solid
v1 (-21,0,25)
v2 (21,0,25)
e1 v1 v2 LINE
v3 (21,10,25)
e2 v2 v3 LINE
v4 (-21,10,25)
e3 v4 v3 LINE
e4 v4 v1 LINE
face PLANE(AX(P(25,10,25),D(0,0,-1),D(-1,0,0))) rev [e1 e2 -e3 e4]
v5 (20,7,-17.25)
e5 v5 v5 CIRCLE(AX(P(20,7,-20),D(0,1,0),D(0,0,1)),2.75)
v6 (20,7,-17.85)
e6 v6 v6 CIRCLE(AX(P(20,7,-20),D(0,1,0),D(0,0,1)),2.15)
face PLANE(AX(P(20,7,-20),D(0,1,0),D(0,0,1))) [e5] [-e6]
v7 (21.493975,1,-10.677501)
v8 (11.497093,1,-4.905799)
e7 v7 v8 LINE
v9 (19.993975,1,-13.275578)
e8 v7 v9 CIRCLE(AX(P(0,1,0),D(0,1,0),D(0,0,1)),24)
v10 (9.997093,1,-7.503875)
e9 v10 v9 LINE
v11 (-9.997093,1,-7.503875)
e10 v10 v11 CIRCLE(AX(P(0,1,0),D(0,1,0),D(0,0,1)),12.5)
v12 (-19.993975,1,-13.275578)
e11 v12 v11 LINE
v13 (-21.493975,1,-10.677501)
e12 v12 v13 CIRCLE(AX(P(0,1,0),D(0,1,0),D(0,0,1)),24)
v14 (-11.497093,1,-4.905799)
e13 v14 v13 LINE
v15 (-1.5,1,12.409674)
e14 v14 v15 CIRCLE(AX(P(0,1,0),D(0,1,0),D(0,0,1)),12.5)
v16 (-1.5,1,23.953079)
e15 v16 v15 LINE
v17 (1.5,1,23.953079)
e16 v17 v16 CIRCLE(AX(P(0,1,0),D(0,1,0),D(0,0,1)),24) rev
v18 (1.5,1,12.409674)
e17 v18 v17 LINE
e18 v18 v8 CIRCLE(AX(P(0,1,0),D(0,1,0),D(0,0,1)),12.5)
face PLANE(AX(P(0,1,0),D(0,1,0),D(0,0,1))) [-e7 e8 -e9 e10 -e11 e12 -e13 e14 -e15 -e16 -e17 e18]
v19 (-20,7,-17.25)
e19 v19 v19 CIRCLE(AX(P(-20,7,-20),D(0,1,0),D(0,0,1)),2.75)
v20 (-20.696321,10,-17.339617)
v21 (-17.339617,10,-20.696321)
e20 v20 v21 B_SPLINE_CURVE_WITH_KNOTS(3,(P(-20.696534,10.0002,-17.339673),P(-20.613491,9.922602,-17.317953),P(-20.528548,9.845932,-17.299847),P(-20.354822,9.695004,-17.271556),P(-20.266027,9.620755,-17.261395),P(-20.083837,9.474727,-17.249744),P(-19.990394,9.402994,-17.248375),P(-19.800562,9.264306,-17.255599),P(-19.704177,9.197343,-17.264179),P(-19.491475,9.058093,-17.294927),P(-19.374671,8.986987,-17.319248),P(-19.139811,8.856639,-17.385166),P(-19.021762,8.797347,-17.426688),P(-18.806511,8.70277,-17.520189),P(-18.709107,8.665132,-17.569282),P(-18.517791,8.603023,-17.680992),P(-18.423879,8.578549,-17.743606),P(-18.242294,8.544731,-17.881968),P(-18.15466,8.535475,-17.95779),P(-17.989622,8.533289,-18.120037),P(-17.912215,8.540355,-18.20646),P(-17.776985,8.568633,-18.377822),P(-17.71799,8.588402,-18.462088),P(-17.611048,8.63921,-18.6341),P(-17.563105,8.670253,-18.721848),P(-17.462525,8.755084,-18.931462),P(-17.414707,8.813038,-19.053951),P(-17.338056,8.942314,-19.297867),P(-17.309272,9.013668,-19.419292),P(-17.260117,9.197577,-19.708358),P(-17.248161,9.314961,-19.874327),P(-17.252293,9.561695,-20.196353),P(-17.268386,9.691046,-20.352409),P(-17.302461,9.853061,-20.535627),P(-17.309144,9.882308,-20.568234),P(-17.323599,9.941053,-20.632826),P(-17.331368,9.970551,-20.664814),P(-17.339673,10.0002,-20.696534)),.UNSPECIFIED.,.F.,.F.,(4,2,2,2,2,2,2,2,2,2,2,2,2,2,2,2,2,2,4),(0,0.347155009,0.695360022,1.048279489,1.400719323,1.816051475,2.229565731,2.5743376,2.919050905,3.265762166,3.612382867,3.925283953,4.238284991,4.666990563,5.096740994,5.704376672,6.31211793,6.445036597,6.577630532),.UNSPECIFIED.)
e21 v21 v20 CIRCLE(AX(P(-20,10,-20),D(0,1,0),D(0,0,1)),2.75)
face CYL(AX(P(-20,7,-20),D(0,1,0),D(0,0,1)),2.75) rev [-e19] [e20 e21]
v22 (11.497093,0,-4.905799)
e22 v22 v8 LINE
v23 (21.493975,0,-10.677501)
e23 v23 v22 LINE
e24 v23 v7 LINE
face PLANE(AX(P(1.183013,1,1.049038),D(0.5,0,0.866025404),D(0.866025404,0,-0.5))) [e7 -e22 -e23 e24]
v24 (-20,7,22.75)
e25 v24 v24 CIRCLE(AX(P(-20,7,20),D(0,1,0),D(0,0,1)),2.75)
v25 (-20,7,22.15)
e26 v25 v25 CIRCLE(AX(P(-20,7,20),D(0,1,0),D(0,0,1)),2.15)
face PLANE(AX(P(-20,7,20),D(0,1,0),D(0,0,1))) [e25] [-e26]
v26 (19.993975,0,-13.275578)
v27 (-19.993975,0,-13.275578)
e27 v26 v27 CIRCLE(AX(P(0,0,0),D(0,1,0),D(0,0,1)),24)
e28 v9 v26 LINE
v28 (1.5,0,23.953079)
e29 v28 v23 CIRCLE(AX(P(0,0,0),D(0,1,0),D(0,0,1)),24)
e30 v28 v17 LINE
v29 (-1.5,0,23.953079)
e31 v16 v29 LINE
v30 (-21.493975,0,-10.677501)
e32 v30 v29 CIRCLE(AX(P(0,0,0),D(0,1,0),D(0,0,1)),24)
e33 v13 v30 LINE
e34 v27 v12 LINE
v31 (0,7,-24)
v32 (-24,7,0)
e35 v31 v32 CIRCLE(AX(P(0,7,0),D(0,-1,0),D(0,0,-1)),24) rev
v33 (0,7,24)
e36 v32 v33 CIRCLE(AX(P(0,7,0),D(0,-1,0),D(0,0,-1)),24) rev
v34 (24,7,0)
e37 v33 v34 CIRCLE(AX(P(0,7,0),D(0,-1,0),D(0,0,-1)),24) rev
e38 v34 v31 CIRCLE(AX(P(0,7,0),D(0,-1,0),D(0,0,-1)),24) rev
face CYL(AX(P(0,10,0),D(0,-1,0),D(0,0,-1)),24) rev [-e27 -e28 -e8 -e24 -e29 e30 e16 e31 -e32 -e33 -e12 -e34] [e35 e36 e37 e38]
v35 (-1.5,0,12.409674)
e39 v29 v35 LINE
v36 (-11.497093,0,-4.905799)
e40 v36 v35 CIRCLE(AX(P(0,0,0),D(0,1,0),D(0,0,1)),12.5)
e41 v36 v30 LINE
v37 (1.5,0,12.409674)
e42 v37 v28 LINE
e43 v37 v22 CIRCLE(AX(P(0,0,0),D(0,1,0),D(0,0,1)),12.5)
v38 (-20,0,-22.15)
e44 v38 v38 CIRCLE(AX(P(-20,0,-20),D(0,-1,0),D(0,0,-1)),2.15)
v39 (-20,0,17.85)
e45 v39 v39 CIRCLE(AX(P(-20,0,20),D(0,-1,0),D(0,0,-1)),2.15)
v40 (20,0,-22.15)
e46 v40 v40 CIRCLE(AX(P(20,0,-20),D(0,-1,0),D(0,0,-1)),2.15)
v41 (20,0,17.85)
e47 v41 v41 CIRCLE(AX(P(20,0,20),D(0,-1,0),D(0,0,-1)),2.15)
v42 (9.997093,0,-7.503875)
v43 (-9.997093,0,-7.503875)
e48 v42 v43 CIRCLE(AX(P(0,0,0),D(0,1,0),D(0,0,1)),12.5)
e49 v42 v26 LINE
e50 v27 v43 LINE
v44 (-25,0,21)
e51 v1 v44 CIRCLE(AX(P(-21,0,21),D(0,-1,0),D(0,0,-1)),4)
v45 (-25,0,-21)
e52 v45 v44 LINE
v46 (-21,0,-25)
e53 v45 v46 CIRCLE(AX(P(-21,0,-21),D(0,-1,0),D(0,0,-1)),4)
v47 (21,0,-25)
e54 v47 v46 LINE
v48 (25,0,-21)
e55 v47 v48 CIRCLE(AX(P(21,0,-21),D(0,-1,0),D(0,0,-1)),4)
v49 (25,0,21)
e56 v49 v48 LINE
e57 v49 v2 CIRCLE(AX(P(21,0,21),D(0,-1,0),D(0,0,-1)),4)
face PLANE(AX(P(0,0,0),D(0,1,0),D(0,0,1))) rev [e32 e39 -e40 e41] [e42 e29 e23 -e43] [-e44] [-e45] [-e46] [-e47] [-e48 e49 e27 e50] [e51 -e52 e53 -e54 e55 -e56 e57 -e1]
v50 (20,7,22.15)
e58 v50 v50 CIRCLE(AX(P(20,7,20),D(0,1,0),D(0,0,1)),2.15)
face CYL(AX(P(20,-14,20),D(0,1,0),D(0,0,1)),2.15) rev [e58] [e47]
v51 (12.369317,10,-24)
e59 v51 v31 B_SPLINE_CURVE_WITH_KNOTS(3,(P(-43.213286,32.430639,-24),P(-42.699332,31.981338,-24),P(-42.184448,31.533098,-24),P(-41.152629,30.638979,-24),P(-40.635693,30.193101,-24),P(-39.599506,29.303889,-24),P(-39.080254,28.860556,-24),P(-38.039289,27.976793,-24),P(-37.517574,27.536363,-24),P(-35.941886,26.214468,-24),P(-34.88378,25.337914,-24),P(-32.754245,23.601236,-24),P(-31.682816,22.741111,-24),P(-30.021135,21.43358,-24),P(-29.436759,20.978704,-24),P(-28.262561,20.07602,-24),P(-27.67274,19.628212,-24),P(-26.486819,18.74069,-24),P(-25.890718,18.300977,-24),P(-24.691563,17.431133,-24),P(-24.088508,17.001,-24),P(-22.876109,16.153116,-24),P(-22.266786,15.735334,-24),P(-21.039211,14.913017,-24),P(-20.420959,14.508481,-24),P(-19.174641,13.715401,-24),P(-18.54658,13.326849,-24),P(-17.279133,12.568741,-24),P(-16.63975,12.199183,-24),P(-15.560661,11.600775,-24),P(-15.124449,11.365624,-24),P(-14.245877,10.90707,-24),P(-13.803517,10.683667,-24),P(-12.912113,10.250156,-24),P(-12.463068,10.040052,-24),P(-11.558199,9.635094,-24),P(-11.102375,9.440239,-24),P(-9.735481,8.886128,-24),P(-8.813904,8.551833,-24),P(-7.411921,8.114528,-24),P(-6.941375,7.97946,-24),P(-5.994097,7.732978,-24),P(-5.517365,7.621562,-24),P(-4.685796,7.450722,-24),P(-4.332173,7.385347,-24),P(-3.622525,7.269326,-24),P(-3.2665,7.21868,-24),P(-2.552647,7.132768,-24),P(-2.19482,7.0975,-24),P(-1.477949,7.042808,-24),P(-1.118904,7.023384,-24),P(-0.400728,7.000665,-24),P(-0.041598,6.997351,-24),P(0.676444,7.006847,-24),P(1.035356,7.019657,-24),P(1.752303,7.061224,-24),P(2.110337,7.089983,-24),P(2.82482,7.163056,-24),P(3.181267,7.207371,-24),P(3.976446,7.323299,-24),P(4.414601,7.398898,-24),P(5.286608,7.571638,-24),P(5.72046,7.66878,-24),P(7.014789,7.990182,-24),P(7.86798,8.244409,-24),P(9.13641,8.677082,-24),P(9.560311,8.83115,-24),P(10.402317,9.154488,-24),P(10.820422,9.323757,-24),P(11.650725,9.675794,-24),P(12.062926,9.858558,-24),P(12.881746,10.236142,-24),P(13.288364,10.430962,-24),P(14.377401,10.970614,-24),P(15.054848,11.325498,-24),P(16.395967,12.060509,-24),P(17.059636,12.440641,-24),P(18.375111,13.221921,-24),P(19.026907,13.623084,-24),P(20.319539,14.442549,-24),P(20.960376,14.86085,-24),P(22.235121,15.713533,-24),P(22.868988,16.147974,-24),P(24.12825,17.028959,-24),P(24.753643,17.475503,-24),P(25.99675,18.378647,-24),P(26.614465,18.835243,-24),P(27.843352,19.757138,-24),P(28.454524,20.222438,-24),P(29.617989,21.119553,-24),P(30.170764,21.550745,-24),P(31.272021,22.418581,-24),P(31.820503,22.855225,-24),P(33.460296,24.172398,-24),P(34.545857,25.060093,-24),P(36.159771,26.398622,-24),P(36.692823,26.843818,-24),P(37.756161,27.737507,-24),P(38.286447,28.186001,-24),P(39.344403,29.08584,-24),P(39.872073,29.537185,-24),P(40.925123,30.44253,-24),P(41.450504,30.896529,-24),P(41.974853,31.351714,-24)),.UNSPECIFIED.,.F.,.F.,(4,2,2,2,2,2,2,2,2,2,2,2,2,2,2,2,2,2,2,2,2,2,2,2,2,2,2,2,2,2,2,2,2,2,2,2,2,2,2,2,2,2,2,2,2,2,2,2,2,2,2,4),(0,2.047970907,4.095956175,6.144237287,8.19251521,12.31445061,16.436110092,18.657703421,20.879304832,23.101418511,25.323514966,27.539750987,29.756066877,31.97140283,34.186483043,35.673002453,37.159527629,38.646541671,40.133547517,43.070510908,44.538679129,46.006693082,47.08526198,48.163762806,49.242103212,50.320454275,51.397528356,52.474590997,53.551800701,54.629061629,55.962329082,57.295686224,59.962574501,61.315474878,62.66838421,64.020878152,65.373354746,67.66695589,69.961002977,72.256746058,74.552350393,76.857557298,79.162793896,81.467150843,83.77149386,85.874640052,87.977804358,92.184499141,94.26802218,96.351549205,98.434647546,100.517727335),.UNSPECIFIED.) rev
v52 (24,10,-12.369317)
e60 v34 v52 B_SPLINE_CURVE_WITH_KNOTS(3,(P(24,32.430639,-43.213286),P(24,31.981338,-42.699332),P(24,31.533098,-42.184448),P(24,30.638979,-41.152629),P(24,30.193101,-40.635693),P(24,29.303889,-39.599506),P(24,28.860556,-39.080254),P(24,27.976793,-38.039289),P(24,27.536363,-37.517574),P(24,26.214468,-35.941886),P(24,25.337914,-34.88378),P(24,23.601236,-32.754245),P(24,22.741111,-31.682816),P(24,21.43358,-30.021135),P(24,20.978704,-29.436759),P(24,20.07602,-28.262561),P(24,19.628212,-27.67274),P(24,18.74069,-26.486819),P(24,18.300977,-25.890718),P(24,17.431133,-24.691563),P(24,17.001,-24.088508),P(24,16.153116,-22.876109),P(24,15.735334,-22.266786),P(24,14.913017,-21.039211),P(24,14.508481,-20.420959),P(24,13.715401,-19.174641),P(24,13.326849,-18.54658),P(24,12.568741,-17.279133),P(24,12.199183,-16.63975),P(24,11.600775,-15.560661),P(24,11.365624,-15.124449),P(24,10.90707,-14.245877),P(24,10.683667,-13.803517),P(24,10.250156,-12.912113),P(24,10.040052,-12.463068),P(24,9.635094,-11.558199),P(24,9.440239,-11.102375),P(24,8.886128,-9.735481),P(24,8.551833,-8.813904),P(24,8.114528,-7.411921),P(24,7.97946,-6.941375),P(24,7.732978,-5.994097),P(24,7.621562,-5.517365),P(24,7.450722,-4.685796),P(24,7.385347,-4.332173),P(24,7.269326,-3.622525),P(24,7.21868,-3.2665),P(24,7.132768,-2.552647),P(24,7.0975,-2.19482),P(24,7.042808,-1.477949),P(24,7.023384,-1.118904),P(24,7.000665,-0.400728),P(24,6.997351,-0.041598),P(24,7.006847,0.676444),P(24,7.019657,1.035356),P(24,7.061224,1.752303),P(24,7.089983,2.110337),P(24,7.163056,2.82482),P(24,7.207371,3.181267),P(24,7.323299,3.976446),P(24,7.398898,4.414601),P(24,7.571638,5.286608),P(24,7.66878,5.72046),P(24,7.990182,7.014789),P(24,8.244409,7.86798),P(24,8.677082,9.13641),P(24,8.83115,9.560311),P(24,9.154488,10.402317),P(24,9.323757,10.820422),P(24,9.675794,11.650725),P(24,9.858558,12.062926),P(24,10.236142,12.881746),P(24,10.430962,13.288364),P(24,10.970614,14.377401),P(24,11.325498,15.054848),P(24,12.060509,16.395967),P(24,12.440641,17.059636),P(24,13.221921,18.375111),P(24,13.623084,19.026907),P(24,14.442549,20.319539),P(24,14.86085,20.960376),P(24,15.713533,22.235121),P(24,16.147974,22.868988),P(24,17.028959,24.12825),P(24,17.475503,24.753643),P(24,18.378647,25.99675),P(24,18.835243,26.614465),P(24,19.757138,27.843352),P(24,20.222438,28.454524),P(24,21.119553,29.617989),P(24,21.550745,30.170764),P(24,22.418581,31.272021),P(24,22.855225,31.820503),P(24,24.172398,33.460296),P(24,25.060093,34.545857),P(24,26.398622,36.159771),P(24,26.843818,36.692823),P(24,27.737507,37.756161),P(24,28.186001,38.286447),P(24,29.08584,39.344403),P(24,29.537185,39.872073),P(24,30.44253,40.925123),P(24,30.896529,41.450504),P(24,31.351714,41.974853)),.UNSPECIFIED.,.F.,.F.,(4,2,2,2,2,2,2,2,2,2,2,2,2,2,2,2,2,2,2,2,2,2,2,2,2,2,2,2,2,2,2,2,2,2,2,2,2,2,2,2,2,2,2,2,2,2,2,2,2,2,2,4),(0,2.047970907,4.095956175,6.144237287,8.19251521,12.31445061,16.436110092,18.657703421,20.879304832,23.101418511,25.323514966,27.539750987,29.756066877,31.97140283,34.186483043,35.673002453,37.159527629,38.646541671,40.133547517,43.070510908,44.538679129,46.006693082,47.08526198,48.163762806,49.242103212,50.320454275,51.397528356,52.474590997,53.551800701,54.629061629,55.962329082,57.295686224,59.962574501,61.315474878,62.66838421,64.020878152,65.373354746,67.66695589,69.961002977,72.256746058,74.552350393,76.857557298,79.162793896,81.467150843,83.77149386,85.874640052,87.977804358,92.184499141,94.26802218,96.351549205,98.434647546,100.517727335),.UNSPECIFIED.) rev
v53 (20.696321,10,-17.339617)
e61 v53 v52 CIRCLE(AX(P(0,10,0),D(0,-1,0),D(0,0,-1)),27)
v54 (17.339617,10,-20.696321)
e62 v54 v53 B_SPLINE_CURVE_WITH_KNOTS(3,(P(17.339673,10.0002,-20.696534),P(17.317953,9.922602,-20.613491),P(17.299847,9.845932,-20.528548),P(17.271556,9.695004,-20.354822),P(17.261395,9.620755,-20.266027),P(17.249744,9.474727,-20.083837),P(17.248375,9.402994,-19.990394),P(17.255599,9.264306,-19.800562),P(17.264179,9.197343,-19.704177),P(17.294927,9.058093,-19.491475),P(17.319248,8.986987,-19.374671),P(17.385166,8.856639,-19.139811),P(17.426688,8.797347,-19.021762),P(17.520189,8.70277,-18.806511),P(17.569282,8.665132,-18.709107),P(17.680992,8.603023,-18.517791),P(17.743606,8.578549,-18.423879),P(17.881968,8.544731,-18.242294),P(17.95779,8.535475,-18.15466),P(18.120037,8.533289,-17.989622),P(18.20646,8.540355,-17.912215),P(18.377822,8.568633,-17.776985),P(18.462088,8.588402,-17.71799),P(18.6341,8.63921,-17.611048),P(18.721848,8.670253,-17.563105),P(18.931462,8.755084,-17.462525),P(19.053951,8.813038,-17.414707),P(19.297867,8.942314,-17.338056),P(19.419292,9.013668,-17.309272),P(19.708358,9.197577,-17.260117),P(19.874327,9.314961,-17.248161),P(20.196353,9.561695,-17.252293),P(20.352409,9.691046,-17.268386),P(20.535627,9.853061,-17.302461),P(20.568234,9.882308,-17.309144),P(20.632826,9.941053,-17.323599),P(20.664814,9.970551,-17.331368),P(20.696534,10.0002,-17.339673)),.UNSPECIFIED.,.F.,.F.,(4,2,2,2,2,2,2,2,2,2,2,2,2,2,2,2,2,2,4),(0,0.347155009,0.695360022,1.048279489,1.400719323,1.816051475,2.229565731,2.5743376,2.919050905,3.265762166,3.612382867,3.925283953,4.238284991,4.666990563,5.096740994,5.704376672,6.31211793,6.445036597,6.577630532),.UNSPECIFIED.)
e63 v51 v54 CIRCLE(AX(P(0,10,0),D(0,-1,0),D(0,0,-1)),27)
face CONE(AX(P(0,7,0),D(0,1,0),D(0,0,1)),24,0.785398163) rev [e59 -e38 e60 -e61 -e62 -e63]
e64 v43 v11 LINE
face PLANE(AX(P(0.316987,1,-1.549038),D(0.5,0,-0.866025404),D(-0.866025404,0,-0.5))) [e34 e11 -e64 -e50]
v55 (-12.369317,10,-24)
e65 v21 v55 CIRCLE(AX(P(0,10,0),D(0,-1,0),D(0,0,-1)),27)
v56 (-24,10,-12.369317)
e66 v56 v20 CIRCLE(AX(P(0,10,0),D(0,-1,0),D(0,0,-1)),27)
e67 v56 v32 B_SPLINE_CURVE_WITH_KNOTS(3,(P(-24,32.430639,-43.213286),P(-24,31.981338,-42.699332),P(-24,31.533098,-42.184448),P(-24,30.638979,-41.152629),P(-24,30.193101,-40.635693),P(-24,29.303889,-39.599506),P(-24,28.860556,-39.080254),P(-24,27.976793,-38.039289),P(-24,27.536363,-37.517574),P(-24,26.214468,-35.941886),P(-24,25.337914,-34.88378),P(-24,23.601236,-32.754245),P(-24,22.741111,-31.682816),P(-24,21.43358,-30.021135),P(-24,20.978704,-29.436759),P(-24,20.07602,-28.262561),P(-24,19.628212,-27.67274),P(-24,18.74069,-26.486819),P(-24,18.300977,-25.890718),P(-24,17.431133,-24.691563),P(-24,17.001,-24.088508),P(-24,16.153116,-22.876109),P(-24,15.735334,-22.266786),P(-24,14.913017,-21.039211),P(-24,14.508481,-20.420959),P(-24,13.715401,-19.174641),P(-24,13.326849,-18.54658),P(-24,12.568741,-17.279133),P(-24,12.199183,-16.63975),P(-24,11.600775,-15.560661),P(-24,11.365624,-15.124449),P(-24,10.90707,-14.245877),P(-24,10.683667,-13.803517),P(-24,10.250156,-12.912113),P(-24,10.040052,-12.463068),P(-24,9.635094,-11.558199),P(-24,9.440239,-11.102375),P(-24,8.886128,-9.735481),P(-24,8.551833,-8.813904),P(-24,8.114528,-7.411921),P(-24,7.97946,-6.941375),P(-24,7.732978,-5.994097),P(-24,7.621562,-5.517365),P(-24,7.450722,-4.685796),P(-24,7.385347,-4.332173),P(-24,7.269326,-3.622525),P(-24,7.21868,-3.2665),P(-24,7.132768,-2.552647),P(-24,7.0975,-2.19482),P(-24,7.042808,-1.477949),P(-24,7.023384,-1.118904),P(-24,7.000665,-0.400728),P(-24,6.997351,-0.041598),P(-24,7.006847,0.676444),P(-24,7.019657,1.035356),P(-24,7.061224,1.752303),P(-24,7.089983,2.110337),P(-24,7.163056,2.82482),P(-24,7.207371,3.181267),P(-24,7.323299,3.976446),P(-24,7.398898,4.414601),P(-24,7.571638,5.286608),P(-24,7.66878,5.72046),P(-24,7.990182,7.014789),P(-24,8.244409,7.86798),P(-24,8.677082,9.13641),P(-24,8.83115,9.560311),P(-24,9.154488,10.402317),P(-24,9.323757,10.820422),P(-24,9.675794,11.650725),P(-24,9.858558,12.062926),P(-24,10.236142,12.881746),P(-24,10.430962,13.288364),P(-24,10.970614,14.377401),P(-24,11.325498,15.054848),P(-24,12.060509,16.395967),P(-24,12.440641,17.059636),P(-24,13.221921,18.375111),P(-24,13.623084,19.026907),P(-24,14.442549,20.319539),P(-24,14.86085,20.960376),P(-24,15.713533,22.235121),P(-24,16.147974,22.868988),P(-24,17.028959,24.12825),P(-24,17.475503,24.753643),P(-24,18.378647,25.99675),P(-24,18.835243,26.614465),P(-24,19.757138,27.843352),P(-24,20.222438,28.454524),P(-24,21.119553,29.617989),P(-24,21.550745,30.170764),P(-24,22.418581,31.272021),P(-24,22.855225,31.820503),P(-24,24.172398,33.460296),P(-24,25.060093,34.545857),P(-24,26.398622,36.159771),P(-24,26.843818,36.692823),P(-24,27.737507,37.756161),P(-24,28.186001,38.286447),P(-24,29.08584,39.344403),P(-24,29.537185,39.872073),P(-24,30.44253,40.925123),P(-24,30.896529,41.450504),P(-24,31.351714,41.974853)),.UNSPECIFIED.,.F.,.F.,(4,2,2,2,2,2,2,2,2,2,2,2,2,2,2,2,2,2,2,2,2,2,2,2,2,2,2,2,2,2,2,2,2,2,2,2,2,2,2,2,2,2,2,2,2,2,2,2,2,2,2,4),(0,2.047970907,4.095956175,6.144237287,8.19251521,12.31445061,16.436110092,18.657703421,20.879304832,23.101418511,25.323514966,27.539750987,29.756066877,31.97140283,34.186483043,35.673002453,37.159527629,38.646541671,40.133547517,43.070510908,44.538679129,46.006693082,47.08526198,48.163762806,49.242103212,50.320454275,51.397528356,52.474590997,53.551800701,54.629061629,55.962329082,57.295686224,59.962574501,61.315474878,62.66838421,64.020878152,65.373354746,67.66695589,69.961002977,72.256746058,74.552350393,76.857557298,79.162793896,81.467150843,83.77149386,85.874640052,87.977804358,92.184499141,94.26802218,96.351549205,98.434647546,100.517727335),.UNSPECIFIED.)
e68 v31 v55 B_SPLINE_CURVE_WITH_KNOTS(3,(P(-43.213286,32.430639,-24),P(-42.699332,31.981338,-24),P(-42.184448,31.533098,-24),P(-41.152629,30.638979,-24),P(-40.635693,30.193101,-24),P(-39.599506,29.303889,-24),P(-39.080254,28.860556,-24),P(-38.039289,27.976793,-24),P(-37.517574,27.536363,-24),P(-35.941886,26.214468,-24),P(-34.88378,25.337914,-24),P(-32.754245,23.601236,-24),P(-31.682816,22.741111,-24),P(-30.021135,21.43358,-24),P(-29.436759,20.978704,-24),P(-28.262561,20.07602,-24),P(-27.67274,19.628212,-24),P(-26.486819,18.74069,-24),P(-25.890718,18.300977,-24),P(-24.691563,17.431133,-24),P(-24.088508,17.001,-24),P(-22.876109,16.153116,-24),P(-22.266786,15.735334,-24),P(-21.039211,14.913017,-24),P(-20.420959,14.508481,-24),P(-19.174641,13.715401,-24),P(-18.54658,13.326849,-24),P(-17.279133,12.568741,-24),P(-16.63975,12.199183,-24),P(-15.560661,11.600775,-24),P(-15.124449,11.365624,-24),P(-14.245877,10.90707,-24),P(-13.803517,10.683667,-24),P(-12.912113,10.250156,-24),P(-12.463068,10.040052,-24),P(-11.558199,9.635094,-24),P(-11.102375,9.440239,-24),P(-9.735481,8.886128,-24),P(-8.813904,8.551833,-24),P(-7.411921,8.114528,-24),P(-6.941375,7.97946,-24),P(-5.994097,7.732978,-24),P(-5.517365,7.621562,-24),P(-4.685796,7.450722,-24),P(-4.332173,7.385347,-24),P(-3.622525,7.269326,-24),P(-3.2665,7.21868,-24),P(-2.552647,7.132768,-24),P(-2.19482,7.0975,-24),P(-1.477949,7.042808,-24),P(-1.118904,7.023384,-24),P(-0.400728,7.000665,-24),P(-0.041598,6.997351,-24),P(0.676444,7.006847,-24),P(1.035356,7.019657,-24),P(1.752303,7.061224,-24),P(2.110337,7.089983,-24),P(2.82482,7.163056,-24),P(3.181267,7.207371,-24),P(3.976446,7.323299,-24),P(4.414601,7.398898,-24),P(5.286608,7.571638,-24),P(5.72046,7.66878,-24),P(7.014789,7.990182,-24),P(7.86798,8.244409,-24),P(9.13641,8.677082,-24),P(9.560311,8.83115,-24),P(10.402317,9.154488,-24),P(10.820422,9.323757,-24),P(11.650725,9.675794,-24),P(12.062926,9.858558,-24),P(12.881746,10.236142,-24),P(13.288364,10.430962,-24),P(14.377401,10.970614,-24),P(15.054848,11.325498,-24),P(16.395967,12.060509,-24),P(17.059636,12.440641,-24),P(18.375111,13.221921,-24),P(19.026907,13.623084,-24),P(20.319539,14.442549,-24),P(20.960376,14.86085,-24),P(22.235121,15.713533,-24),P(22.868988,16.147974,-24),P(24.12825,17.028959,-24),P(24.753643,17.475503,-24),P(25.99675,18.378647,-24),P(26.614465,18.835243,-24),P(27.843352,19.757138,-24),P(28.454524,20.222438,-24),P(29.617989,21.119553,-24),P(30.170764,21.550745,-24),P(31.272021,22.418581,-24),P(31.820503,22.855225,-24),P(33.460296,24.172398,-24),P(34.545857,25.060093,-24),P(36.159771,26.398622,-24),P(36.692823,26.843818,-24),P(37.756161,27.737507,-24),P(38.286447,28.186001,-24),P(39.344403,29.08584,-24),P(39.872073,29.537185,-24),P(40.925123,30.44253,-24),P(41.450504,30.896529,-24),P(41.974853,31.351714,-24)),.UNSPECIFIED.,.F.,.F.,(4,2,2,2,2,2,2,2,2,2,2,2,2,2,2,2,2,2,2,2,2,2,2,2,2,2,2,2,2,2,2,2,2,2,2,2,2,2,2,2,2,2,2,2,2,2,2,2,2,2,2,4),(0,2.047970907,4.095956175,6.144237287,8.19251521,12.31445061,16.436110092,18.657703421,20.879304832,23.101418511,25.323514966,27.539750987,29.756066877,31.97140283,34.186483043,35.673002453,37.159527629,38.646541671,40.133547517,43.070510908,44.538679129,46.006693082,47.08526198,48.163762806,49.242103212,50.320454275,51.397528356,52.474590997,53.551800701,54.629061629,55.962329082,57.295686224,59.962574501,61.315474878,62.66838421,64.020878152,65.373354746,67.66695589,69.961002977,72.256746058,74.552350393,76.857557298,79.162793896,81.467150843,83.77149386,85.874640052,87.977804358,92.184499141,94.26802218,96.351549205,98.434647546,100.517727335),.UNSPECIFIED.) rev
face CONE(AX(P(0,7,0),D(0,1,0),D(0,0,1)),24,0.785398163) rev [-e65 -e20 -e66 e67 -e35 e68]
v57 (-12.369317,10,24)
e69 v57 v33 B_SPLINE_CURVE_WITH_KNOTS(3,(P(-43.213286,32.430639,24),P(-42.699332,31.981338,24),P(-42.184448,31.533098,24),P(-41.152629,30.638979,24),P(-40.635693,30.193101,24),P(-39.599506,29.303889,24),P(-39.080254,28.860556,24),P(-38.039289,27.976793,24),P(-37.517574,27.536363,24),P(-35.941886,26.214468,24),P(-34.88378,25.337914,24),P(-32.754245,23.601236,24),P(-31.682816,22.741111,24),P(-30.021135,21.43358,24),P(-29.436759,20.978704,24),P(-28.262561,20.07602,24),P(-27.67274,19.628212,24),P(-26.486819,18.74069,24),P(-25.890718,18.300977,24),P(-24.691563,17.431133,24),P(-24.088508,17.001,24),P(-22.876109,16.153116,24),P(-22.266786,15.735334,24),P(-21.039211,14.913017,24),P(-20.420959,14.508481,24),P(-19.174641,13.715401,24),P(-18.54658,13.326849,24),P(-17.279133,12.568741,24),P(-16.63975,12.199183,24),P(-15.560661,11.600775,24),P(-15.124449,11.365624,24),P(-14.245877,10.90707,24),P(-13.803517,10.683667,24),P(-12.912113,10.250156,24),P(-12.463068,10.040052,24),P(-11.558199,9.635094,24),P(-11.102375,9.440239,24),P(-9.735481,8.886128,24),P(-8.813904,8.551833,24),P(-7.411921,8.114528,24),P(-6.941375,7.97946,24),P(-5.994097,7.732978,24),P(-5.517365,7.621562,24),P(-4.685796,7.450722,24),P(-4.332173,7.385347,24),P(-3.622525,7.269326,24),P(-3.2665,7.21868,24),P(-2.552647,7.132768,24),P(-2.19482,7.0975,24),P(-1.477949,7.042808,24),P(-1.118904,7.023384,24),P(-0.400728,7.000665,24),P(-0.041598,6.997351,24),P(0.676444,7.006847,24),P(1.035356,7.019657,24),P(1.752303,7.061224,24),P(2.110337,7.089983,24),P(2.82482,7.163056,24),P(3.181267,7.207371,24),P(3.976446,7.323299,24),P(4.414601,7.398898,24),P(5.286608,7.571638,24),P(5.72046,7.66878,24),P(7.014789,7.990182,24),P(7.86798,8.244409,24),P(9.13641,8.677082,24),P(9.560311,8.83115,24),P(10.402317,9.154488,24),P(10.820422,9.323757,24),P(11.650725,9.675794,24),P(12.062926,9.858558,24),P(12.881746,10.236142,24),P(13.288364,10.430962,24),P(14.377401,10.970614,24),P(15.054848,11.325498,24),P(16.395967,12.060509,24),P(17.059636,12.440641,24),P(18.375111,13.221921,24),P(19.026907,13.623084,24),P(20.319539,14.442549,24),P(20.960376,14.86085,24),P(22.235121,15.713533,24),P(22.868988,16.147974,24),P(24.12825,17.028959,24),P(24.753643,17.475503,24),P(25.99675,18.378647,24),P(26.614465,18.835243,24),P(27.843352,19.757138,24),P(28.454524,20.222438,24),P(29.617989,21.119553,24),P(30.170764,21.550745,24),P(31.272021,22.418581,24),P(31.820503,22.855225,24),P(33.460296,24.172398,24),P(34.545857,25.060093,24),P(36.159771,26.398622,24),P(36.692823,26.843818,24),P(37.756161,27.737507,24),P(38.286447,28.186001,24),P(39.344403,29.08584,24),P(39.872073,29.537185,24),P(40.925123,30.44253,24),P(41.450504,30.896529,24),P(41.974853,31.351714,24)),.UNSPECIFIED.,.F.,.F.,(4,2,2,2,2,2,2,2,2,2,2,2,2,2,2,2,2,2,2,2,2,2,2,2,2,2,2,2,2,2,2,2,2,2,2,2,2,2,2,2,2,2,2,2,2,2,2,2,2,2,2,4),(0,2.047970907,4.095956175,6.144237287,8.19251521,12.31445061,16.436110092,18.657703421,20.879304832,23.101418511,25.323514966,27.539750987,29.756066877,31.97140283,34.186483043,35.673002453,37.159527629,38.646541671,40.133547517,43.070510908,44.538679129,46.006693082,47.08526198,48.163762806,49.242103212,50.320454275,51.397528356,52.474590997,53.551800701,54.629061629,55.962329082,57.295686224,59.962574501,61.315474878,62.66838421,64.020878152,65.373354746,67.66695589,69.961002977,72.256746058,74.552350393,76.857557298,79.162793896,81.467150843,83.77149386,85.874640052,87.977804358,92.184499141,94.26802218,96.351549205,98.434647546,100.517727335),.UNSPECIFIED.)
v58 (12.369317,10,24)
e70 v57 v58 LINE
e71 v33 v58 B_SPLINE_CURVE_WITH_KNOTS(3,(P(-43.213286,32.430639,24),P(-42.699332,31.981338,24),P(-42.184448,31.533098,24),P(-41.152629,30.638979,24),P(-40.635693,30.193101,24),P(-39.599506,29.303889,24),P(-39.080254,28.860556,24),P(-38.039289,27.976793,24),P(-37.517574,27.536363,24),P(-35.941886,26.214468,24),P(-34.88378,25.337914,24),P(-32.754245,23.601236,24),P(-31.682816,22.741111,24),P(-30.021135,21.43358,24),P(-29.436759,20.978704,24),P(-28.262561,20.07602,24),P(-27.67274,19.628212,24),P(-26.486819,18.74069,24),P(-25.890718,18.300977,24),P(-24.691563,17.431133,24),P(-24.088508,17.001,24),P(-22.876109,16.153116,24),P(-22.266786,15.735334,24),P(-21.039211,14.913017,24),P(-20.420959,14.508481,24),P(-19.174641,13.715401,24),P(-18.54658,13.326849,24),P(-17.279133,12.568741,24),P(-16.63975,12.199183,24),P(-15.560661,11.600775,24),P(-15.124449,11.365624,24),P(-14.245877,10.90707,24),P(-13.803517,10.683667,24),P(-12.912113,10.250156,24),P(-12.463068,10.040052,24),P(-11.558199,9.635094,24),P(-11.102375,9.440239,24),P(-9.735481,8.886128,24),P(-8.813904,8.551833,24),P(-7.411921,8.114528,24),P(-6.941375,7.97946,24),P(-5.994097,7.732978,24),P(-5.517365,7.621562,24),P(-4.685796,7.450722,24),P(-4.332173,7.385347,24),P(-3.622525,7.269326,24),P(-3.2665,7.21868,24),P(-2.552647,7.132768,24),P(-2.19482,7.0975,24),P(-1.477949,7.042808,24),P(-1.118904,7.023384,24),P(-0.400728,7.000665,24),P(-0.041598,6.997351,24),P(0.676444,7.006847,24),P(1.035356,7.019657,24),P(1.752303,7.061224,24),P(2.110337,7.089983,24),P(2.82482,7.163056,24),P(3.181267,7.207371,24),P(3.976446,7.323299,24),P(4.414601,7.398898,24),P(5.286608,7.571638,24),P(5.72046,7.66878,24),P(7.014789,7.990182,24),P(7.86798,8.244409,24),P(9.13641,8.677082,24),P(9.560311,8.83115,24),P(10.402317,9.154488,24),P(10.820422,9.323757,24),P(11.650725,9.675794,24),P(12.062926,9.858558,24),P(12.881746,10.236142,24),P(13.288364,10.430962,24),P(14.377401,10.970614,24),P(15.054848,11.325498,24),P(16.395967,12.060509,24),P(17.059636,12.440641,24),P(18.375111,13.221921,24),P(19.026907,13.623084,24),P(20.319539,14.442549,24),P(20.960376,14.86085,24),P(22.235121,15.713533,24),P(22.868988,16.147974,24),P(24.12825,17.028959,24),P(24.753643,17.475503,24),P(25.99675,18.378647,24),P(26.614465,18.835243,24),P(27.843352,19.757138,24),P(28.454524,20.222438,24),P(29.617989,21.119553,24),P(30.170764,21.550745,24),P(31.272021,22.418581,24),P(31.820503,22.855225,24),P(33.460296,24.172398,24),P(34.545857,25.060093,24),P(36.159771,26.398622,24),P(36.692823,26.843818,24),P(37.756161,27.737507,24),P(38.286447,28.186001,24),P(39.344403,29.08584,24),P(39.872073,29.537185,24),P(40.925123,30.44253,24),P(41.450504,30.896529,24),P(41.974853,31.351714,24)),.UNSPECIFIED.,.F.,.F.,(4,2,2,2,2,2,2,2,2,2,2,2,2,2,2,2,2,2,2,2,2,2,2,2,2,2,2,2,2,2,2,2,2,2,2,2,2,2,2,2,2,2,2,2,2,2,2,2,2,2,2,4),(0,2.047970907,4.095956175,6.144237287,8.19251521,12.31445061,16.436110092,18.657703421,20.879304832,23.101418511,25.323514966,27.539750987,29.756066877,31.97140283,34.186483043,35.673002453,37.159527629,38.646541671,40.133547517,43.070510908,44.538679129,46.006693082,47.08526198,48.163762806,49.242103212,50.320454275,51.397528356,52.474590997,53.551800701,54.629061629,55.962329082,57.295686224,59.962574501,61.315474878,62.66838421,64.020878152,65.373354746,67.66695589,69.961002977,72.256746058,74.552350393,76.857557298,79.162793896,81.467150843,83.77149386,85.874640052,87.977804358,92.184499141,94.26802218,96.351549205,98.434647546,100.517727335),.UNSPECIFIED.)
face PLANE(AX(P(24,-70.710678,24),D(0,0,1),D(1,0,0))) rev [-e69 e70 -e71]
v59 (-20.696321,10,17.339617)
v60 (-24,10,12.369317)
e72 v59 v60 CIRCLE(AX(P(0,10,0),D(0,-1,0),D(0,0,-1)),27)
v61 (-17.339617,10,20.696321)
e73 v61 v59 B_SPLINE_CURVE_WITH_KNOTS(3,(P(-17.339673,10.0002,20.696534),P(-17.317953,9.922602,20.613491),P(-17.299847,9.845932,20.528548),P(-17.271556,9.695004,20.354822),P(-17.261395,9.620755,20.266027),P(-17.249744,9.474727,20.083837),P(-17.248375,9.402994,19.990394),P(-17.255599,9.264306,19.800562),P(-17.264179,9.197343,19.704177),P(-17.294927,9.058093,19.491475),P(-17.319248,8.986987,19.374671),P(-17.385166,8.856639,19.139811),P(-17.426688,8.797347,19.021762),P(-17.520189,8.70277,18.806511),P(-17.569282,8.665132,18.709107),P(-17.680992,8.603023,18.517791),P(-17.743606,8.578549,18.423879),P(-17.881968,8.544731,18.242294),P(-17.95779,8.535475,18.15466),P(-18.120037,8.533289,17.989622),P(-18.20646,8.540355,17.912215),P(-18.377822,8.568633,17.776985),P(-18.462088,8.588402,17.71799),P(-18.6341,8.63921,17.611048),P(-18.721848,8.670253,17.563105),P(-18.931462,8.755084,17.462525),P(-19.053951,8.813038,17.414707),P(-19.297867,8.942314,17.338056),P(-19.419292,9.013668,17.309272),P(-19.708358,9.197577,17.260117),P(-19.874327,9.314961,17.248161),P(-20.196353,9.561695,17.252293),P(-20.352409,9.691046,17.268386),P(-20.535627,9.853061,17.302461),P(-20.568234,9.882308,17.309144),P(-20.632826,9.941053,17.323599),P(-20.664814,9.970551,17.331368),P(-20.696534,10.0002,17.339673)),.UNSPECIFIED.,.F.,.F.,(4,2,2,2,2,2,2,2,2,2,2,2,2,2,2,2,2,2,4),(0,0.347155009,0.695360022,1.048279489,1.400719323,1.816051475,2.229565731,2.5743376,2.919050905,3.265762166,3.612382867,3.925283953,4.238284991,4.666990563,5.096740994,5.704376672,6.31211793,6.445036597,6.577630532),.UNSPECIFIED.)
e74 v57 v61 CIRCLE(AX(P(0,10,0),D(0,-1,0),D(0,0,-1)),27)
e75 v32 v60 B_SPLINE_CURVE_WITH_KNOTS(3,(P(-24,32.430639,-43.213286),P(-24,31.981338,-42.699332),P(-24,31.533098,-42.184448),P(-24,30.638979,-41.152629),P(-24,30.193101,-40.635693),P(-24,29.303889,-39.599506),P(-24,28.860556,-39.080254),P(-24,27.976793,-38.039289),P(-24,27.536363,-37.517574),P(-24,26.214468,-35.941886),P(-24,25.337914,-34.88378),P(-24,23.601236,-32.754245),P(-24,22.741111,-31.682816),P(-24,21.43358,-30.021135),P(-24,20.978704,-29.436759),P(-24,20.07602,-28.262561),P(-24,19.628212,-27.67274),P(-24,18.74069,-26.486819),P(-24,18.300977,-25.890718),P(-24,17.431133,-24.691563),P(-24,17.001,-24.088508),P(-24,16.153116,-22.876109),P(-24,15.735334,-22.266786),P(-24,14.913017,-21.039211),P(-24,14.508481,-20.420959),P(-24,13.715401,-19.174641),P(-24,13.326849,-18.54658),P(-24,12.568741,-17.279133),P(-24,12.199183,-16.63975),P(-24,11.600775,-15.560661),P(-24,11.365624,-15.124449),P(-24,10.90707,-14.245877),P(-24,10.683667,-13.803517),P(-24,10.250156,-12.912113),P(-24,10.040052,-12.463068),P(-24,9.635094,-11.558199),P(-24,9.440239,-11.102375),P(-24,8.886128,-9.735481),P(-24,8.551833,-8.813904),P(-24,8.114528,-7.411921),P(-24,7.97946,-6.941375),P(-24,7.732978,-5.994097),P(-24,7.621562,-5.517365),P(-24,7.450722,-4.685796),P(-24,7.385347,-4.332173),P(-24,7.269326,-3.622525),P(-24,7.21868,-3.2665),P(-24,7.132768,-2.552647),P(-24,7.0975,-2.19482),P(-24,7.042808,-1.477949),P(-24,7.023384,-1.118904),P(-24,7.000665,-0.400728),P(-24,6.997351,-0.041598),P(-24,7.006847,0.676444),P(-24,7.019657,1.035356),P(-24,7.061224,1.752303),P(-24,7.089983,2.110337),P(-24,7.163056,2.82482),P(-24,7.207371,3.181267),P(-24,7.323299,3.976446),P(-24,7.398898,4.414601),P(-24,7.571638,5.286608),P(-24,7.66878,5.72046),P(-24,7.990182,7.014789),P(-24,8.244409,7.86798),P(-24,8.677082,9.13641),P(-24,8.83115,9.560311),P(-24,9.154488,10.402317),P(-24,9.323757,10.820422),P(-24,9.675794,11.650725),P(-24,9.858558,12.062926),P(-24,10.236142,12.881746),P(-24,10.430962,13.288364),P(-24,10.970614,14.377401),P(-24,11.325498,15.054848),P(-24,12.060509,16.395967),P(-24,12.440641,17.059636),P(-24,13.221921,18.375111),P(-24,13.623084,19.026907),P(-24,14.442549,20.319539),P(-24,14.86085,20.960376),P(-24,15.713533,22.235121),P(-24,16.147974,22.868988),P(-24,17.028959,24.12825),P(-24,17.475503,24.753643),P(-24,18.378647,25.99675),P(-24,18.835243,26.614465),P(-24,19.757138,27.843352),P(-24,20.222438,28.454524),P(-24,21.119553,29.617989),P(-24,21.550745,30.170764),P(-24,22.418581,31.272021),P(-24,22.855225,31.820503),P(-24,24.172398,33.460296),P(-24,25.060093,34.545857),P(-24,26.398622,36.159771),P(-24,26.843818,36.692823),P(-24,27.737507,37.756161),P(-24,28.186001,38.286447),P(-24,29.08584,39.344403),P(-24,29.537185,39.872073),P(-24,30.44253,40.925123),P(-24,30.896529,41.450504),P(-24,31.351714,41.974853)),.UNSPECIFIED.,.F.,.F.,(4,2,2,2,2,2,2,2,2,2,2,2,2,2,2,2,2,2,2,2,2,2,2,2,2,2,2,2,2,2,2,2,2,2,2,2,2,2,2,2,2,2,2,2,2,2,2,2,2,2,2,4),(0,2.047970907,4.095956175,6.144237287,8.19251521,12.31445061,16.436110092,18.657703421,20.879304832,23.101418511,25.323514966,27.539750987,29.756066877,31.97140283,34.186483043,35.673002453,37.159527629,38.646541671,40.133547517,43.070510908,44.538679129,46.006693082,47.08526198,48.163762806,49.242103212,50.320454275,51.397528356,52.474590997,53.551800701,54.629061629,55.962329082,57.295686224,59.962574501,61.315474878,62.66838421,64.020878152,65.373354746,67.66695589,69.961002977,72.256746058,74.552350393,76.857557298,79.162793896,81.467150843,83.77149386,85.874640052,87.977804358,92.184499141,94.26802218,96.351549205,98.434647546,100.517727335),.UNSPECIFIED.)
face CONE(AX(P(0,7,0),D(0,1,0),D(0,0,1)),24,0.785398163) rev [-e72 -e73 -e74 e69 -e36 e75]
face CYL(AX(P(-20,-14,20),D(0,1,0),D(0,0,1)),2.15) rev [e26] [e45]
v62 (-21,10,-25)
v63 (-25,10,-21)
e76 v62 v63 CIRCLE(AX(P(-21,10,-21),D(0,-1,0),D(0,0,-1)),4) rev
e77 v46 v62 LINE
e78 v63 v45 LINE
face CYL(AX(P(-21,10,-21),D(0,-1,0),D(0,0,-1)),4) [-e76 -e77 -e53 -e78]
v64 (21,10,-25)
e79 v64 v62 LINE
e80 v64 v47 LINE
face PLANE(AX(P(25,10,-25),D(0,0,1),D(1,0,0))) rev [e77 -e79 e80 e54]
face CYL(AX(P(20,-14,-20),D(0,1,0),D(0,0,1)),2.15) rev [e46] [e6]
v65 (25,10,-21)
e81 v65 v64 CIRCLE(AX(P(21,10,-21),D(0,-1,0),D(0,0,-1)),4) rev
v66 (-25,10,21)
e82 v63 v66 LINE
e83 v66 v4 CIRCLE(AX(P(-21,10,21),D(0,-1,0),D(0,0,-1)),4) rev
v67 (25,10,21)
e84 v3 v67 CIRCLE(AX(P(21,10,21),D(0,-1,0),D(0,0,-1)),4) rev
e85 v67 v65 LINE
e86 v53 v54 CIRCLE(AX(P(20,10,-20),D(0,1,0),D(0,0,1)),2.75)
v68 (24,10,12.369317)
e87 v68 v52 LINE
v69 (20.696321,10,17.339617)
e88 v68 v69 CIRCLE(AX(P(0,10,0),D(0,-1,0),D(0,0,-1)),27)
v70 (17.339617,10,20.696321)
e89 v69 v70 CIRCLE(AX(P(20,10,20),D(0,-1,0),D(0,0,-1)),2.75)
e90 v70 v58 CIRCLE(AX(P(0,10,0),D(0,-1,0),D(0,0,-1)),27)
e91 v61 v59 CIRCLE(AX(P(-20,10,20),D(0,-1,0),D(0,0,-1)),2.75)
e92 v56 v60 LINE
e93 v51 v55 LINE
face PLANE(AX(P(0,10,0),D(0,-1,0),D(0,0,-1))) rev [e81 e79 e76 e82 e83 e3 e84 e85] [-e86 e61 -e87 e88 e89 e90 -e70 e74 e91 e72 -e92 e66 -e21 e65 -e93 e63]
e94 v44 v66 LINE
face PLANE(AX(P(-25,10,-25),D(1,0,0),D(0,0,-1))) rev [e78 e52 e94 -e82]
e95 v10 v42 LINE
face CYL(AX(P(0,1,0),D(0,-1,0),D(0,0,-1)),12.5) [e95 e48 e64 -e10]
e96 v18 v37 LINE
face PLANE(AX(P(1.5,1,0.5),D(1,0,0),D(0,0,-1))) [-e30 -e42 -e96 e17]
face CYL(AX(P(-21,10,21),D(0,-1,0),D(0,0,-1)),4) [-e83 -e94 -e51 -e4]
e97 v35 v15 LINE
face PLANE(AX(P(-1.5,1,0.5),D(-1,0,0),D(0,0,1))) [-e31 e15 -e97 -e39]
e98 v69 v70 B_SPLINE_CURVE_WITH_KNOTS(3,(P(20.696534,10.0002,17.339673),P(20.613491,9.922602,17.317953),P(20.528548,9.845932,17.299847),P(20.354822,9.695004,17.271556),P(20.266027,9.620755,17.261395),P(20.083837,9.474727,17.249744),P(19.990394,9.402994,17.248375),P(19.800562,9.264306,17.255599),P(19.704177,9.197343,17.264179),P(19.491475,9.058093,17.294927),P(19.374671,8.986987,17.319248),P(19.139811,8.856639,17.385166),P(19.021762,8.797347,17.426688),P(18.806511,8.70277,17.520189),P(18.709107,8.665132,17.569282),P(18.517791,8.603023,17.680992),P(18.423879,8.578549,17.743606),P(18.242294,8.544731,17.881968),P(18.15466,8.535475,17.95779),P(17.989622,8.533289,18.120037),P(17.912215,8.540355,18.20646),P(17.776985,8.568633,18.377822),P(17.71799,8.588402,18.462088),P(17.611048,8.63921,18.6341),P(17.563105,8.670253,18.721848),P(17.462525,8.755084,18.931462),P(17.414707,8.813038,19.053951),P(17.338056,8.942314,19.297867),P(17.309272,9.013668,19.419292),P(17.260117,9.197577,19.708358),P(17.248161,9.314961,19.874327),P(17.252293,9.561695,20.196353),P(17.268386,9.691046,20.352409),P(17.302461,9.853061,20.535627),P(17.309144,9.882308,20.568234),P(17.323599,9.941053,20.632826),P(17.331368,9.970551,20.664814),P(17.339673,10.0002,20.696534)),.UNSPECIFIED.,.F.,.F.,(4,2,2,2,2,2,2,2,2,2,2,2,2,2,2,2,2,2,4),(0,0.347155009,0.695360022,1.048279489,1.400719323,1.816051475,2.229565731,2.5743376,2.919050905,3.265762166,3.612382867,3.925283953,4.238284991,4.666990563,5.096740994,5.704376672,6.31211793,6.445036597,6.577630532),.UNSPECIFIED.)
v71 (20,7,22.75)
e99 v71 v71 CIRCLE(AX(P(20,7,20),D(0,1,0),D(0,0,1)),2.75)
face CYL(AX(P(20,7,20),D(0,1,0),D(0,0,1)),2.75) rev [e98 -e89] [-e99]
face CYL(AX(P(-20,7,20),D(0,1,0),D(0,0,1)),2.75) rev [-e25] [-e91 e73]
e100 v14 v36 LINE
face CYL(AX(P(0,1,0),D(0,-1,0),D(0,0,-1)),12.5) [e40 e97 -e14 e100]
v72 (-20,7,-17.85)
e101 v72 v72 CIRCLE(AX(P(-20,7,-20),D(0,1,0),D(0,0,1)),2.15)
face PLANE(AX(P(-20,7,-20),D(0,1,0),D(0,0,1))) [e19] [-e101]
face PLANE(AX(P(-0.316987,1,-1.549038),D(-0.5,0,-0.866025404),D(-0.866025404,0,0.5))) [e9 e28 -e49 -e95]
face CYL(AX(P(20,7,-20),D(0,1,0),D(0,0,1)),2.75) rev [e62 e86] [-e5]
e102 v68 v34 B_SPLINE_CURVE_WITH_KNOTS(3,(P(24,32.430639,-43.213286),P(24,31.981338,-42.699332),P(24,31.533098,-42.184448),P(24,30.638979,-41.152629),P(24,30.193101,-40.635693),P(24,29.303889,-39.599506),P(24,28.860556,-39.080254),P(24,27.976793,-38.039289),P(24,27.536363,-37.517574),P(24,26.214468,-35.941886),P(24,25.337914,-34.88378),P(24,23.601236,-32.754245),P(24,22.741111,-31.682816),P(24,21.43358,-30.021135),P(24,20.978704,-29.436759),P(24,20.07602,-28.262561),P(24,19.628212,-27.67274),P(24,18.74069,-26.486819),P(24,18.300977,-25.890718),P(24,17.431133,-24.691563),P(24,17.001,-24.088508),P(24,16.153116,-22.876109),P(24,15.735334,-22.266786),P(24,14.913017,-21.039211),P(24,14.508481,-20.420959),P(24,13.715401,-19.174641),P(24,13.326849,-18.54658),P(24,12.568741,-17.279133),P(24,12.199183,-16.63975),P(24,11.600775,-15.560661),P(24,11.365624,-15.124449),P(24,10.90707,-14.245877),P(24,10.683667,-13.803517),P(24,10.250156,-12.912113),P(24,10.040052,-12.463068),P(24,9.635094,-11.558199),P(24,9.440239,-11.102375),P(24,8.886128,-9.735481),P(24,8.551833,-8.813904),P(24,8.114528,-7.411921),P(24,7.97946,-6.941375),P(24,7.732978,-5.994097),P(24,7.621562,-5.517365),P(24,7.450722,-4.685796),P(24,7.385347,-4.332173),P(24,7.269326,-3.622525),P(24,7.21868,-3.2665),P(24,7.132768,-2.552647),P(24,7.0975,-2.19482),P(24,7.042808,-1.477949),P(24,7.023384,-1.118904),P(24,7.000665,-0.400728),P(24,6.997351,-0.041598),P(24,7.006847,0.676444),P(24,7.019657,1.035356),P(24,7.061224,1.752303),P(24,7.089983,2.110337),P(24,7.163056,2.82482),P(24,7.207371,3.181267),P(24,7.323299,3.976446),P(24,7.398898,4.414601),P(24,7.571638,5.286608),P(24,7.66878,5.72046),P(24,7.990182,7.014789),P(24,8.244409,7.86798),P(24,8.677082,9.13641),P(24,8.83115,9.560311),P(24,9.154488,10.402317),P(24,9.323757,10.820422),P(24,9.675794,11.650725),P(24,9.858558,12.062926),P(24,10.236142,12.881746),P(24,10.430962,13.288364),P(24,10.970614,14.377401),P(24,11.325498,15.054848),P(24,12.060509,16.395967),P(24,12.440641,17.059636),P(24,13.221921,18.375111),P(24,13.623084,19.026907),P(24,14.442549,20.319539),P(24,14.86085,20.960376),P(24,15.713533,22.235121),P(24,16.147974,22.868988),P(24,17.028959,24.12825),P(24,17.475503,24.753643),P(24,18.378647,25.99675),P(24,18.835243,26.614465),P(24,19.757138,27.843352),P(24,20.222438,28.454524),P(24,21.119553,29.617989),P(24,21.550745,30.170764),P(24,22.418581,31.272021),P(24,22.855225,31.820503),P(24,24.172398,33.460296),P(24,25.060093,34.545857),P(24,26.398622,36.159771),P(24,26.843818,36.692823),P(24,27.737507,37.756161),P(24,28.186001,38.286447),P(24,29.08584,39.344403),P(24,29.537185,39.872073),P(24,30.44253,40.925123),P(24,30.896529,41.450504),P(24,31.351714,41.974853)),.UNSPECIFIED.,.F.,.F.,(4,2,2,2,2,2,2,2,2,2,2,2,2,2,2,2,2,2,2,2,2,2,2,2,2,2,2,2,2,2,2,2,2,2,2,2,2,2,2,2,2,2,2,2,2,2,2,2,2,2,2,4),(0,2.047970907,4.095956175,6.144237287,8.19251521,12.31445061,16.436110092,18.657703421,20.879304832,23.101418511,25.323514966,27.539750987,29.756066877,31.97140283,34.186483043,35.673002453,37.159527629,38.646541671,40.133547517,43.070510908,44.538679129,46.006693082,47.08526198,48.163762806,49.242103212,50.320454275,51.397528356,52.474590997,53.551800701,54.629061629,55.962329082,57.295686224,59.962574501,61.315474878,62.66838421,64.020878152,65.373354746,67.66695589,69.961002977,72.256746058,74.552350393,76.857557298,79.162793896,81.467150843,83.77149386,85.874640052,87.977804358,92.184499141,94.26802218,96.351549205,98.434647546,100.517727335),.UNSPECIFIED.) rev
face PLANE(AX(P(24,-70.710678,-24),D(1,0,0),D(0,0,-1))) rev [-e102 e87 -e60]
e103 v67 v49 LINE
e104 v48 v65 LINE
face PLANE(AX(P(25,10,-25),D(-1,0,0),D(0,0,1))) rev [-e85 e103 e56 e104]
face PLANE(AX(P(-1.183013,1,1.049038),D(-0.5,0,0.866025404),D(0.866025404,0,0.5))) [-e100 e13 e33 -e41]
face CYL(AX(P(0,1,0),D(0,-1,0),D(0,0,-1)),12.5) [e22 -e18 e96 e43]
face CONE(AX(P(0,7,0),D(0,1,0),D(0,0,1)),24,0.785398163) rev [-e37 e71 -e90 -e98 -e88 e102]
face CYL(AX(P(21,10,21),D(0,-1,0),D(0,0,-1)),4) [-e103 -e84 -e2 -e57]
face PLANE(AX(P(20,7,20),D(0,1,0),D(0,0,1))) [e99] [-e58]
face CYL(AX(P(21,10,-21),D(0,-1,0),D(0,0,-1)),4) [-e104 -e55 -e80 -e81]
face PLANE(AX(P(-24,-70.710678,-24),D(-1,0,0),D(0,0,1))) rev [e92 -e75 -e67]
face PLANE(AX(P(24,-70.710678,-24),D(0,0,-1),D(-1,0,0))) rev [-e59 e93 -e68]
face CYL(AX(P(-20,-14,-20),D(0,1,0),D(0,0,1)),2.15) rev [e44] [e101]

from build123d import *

# Parameters (mm, degrees)
SKETCH1_W           = 50
SKETCH1_H           = 50
SKETCH1_R           = 24
BOSS_EXTRUDE1_DEPTH = 10
CHAMFER1_SIZE       = 3
BOSS_EXTRUDE2_START = -2.999999
SKETCH4_W           = 50
SKETCH4_H           = 50
SKETCH4_W_2         = 48
SKETCH4_H_2         = 48
BOSS_EXTRUDE2_DEPTH = 2.999999
SKETCH5_R           = 2.75
CUT_EXTRUDE1_DEPTH  = 3
FILLET1_R           = 4
SKETCH6_R           = 12.5
BOSS_EXTRUDE5_DEPTH = 1
SKETCH7_R           = 2.15
CUT_EXTRUDE2_DEPTH  = 21
SKETCH9_W           = 3
SKETCH9_H           = 24
BOSS_EXTRUDE6_DEPTH = 1
CIRPATTERN1_COUNT   = 3


with BuildPart() as part:
    # Sketch1 → Boss-Extrude1 (new body)
    with BuildSketch(Plane(origin=(0, 0, 0), x_dir=(1, 0, 0), z_dir=(0, 1, 0))):
        Rectangle(SKETCH1_W, SKETCH1_H)
        with Locations(Location((0, 0, 0), (0, 0, 270))):
            Circle(SKETCH1_R, mode=Mode.SUBTRACT)
    extrude(amount=BOSS_EXTRUDE1_DEPTH)

    # Chamfer1
    # the kernel refuses this chamfer: 3 mm, written as the material it takes off along each edge
    with BuildSketch(Plane(origin=(0, 10, 0), x_dir=(0, 0, 1), z_dir=(-1, 0, 0))) as chamfer1_piece_1:
        Polygon((24, -CHAMFER1_SIZE), (24 + CHAMFER1_SIZE, 0), (24, 0), align=None)
    revolve(axis=Axis((0, 10, 0), (0, 1, 0)), mode=Mode.SUBTRACT)

    # Sketch4 → Boss-Extrude2 (add)
    with BuildSketch(Plane(origin=(0, 10, 0), x_dir=(1, 0, 0), z_dir=(0, 1, 0)).offset(BOSS_EXTRUDE2_START)):
        Rectangle(SKETCH4_W, SKETCH4_H)
        Rectangle(SKETCH4_W_2, SKETCH4_H_2, mode=Mode.SUBTRACT)
    extrude(amount=BOSS_EXTRUDE2_DEPTH)

    # Sketch5 → Cut-Extrude1 (cut)
    with BuildSketch(Plane(origin=(0, 10, 0), x_dir=(1, 0, 0), z_dir=(0, 1, 0))):
        with Locations(Location((-20, 20, 0), (0, 0, 270))):
            Circle(SKETCH5_R)
        with Locations(Location((20, 20, 0), (0, 0, 270))):
            Circle(SKETCH5_R)
        with Locations(Location((20, -20, 0), (0, 0, 270))):
            Circle(SKETCH5_R)
        with Locations(Location((-20, -20, 0), (0, 0, 270))):
            Circle(SKETCH5_R)
    extrude(amount=-CUT_EXTRUDE1_DEPTH, mode=Mode.SUBTRACT)

    # Fillet1
    fillet1_edges = [part.edges().sort_by_distance(p)[0] for p in [
        (-25, 5, -25),
        (25, 5, -25),
        (25, 5, 25),
        (-25, 5, 25),
    ]]
    fillet(fillet1_edges, radius=FILLET1_R)

    # Sketch7 → Cut-Extrude2 (cut)
    with BuildSketch(Plane(origin=(0, 7, 0), x_dir=(1, 0, 0), z_dir=(0, 1, 0))):
        with Locations(Location((-20, -20, 0), (0, 0, 270))):
            Circle(SKETCH7_R)
        with Locations(Location((-20, 20, 0), (0, 0, 270))):
            Circle(SKETCH7_R)
        with Locations(Location((20, 20, 0), (0, 0, 270))):
            Circle(SKETCH7_R)
        with Locations(Location((20, -20, 0), (0, 0, 270))):
            Circle(SKETCH7_R)
    extrude(amount=-CUT_EXTRUDE2_DEPTH, mode=Mode.SUBTRACT)



with BuildPart() as body_2:
    # Sketch6 → Boss-Extrude5 (new body)
    with BuildSketch(Plane(origin=(0, 0, 0), x_dir=(1, 0, 0), z_dir=(0, 1, 0))):
        with Locations(Location((0, 0, 0), (0, 0, 270))):
            Circle(SKETCH6_R)
    extrude(amount=BOSS_EXTRUDE5_DEPTH)


with BuildPart() as part_1:
    add(part.part)

    add(body_2.part)  # Boss-Extrude6 merges body 2
    # Sketch9 → Boss-Extrude6 (add)
    with BuildSketch(Plane.XZ):
        with Locations((0, 12.5)):
            Rectangle(SKETCH9_W, SKETCH9_H)
    boss_extrude6 = extrude(amount=-BOSS_EXTRUDE6_DEPTH)

    # CirPattern1: Boss-Extrude6 ×3 about axis
    cirpattern1_axis = Axis((0, 0, 0), (0, 1, 0))
    for i in range(1, CIRPATTERN1_COUNT):
        add(boss_extrude6.rotate(cirpattern1_axis, i * 360 / CIRPATTERN1_COUNT))


solid = part_1.part
